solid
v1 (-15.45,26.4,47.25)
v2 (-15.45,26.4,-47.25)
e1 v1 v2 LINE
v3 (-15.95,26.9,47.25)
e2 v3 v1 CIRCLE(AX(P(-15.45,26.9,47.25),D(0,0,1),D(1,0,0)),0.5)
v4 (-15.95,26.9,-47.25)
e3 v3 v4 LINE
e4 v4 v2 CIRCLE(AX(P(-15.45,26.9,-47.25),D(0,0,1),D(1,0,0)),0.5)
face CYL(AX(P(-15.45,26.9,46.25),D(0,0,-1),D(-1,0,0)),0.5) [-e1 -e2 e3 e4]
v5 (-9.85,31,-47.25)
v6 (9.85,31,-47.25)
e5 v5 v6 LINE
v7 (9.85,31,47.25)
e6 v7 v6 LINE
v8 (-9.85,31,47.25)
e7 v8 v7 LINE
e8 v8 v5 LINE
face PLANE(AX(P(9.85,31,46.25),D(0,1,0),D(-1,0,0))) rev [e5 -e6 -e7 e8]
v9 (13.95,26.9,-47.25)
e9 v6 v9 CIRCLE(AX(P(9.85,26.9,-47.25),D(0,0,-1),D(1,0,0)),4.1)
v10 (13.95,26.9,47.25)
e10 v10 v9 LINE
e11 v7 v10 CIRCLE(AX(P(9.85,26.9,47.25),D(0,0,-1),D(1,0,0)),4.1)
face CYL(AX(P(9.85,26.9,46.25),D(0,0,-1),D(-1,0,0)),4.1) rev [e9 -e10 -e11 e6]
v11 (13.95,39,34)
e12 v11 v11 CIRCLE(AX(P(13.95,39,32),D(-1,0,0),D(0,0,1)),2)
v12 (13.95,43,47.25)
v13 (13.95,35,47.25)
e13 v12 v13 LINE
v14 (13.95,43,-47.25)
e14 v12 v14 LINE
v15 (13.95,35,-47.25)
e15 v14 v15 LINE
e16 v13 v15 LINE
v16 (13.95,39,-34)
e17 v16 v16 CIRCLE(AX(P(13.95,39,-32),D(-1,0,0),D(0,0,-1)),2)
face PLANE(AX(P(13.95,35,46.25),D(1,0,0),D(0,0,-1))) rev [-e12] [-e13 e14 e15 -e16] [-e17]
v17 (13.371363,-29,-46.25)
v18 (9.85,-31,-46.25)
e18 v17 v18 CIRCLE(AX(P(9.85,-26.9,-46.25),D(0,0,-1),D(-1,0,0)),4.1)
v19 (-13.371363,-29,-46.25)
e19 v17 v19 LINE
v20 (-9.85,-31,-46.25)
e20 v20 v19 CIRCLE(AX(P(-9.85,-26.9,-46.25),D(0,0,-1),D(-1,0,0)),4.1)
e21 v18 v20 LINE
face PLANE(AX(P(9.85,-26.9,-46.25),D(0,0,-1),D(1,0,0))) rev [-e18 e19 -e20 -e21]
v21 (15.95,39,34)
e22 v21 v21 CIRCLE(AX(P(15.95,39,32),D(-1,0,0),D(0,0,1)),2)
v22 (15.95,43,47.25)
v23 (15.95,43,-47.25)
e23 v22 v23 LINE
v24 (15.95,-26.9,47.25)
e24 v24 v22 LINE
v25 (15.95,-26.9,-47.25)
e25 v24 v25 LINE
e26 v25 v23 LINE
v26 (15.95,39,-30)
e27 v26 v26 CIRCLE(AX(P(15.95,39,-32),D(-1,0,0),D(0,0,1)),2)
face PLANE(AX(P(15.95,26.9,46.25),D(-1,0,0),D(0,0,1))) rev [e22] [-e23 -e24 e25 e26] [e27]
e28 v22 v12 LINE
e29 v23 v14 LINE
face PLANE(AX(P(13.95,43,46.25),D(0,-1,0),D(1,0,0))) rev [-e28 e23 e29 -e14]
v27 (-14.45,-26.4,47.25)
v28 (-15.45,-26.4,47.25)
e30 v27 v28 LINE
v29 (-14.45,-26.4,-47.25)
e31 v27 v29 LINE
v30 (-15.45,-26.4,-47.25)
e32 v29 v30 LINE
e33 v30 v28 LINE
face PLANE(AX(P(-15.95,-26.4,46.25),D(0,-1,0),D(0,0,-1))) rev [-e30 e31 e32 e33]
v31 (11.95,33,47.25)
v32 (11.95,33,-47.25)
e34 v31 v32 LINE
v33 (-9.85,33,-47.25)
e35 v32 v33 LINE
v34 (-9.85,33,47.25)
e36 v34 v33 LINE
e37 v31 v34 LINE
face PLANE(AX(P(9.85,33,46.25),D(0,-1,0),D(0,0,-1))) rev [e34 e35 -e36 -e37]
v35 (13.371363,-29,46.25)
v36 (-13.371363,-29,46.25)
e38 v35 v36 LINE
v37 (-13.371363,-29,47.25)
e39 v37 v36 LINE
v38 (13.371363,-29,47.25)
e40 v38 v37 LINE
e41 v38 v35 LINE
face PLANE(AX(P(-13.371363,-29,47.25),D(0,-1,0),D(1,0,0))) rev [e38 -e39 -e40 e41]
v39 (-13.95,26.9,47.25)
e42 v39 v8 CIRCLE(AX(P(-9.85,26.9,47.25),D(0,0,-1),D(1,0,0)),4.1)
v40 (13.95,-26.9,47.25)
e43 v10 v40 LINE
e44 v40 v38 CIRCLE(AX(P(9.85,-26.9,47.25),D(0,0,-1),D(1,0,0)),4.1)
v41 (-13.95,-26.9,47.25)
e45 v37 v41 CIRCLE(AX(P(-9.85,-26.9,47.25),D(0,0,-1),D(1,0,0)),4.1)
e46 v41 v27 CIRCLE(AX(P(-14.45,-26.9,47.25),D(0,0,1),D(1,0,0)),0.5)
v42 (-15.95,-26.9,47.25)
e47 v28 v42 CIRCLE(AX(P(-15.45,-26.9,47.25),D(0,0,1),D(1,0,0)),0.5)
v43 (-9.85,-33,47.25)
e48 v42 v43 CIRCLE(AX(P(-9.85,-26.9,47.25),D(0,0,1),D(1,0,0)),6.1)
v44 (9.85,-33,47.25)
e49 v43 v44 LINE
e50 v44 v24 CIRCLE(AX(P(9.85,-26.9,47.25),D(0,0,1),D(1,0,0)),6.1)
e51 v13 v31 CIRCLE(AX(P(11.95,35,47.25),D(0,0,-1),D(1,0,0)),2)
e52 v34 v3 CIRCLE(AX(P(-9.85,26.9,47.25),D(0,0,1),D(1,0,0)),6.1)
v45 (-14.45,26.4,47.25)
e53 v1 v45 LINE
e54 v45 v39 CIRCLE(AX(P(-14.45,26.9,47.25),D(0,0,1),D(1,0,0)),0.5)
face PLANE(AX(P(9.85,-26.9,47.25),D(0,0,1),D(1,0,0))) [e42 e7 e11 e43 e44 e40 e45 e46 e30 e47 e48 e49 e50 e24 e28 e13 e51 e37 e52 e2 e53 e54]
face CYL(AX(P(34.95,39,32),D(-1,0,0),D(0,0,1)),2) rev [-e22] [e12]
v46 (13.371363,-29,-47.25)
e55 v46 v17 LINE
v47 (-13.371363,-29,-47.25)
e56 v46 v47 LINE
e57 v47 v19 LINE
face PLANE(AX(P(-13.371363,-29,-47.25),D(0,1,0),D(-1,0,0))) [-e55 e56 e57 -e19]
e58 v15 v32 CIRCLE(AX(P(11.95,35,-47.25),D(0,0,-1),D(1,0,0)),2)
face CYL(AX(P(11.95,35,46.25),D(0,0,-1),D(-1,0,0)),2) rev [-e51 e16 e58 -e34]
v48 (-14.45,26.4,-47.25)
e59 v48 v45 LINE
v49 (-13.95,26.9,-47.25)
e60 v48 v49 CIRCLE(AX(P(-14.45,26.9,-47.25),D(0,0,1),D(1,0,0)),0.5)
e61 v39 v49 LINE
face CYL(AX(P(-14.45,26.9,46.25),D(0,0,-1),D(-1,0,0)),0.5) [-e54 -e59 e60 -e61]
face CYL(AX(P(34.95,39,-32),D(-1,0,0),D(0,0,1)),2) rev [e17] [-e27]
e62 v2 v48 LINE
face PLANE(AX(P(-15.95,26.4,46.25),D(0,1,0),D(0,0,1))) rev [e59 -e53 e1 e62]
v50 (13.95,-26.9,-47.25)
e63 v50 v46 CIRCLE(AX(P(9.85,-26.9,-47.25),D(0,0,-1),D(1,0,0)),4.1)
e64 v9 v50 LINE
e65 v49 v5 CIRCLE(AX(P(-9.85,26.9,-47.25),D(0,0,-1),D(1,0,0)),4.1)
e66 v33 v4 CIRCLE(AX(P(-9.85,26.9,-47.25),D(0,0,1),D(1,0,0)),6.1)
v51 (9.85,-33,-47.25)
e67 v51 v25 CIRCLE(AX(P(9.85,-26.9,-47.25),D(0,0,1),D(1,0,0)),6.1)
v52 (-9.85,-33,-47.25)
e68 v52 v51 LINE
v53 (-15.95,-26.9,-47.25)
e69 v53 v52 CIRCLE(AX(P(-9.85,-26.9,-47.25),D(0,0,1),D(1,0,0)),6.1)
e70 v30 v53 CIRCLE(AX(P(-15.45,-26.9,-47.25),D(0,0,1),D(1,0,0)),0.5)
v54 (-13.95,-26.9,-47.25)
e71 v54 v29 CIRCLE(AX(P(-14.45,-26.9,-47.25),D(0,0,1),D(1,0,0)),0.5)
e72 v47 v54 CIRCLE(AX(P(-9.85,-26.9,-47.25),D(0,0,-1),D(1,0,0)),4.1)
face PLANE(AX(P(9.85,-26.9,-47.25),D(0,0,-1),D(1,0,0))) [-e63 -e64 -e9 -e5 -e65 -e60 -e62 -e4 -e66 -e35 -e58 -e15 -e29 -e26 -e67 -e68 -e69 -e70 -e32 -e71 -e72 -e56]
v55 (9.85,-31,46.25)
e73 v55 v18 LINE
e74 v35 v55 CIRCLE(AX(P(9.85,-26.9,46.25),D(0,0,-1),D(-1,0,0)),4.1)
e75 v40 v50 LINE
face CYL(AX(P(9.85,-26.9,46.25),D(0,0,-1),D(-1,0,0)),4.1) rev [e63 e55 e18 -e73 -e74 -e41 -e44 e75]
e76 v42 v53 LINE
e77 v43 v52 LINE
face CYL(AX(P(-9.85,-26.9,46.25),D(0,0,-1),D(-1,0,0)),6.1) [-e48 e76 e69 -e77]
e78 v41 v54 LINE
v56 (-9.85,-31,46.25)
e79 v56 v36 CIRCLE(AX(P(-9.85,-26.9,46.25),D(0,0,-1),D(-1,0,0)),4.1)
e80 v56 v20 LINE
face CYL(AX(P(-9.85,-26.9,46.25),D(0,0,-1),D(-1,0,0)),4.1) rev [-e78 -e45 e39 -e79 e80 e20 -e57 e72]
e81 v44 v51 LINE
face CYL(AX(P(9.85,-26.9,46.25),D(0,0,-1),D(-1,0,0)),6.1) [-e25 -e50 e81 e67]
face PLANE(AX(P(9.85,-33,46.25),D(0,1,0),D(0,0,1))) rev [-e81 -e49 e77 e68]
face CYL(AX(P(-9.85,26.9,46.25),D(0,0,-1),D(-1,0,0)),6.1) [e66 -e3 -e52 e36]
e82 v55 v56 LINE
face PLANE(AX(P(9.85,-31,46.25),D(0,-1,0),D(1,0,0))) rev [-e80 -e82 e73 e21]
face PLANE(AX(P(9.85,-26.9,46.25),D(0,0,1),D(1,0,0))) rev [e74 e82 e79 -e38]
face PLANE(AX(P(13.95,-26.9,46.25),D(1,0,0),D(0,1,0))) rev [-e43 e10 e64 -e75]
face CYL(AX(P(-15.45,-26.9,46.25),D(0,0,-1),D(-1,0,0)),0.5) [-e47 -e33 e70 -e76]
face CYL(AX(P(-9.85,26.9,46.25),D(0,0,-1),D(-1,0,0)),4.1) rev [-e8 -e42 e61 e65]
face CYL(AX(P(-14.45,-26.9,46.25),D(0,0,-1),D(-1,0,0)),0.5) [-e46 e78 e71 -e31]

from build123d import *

# Parameters (mm, degrees)
BOSS_EXTRUDE1_DEPTH = 46.25
FILLET1_R           = 0.5
BOSS_EXTRUDE2_START = 1
BOSS_EXTRUDE2_DEPTH = 1
SKETCH3_R           = 2
CUT_EXTRUDE1_DEPTH  = 21


with BuildPart() as part:
    # Sketch1 → Boss-Extrude1 (new, symmetric)
    with BuildSketch(Plane(origin=(0, 0, 0), x_dir=(0, 1, 0), z_dir=(0, 0, 1))):
        with BuildLine():
            Line((-26.9, 13.95), (-26.4, 13.95))
            Line((-26.4, 13.95), (-26.4, 15.95))
            Line((-26.4, 15.95), (-26.9, 15.95))
            ThreePointArc((-26.9, 15.95), (-31.213351365, 14.163351365), (-33, 9.85))
            Line((-33, 9.85), (-33, -9.85))
            ThreePointArc((-33, -9.85), (-31.213351365, -14.163351365), (-26.9, -15.95))
            Line((-26.9, -15.95), (26.9, -15.95))
            Line((26.9, -15.95), (43, -15.95))
            Line((43, -15.95), (43, -13.95))
            Line((43, -13.95), (35, -13.95))
            ThreePointArc((35, -13.95), (33.585786438, -13.364213562), (33, -11.95))
            Line((33, -11.95), (33, -9.85))
            Line((33, -9.85), (33, 9.85))
            ThreePointArc((33, 9.85), (31.213351365, 14.163351365), (26.9, 15.95))
            Line((26.9, 15.95), (26.4, 15.95))
            Line((26.4, 15.95), (26.4, 13.95))
            Line((26.4, 13.95), (26.9, 13.95))
            ThreePointArc((26.9, 13.95), (29.799137803, 12.749137803), (31, 9.85))
            Line((31, 9.85), (31, -9.85))
            ThreePointArc((31, -9.85), (29.799137803, -12.749137803), (26.9, -13.95))
            Line((26.9, -13.95), (-26.9, -13.95))
            ThreePointArc((-26.9, -13.95), (-29.799137803, -12.749137803), (-31, -9.85))
            Line((-31, -9.85), (-31, 9.85))
            ThreePointArc((-31, 9.85), (-29.799137803, 12.749137803), (-26.9, 13.95))
        make_face()
    extrude(amount=BOSS_EXTRUDE1_DEPTH, both=True)

    # Fillet1
    fillet1_edges = [part.edges().sort_by_distance(p)[0] for p in [
        (-15.95, 26.4, 0),
        (-13.95, 26.4, 0),
        (-13.95, -26.4, 0),
        (-15.95, -26.4, 0),
    ]]
    fillet(fillet1_edges, radius=FILLET1_R - 0.0001)  # a hair under: the kernel refuses the full size

    # Sketch2 → Boss-Extrude2 (add)
    with BuildSketch(Plane.XY.offset(46.25).offset(BOSS_EXTRUDE2_START)):
        with BuildLine():
            Line((-13.371363372, -29), (13.371363372, -29))
            ThreePointArc((13.371363372, -29), (13.80269464, -27.989130427), (13.95, -26.9))
            Line((13.95, -26.9), (13.95, 26.9))
            ThreePointArc((13.95, 26.9), (12.749137803, 29.799137803), (9.85, 31))
            Line((9.85, 31), (-9.85, 31))
            ThreePointArc((-9.85, 31), (-12.749137803, 29.799137803), (-13.95, 26.9))
            ThreePointArc((-13.95, 26.9), (-14.096446609, 26.546446609), (-14.45, 26.4))
            Line((-14.45, 26.4), (-15.45, 26.4))
            ThreePointArc((-15.45, 26.4), (-15.803553391, 26.546446609), (-15.95, 26.9))
            ThreePointArc((-15.95, 26.9), (-14.163351365, 31.213351365), (-9.85, 33))
            Line((-9.85, 33), (11.95, 33))
            ThreePointArc((11.95, 33), (13.364213562, 33.585786438), (13.95, 35))
            Line((13.95, 35), (13.95, 43))
            Line((13.95, 43), (15.95, 43))
            Line((15.95, 43), (15.95, -26.9))
            ThreePointArc((15.95, -26.9), (14.163351365, -31.213351365), (9.85, -33))
            Line((9.85, -33), (-9.85, -33))
            ThreePointArc((-9.85, -33), (-14.163351365, -31.213351365), (-15.95, -26.9))
            ThreePointArc((-15.95, -26.9), (-15.803553391, -26.546446609), (-15.45, -26.4))
            Line((-15.45, -26.4), (-14.45, -26.4))
            ThreePointArc((-14.45, -26.4), (-14.096446609, -26.546446609), (-13.95, -26.9))
            ThreePointArc((-13.95, -26.9), (-13.80269464, -27.989130427), (-13.371363372, -29))
        make_face()
    boss_extrude2 = extrude(amount=-BOSS_EXTRUDE2_DEPTH)

    # Mirror1: Boss-Extrude2 across plane
    add(boss_extrude2.mirror(Plane.XY))

    # Sketch3 → Cut-Extrude1 (cut)
    with BuildSketch(Plane(origin=(13.95, 0, 0), x_dir=(0, -1, 0), z_dir=(-1, 0, 0))):
        with Locations(Location((-39, 32, 0), (0, 0, 90))):
            Circle(SKETCH3_R)
        with Locations(Location((-39, -32, 0), (0, 0, 90))):
            Circle(SKETCH3_R)
    extrude(amount=-CUT_EXTRUDE1_DEPTH, mode=Mode.SUBTRACT)


solid = part.part
